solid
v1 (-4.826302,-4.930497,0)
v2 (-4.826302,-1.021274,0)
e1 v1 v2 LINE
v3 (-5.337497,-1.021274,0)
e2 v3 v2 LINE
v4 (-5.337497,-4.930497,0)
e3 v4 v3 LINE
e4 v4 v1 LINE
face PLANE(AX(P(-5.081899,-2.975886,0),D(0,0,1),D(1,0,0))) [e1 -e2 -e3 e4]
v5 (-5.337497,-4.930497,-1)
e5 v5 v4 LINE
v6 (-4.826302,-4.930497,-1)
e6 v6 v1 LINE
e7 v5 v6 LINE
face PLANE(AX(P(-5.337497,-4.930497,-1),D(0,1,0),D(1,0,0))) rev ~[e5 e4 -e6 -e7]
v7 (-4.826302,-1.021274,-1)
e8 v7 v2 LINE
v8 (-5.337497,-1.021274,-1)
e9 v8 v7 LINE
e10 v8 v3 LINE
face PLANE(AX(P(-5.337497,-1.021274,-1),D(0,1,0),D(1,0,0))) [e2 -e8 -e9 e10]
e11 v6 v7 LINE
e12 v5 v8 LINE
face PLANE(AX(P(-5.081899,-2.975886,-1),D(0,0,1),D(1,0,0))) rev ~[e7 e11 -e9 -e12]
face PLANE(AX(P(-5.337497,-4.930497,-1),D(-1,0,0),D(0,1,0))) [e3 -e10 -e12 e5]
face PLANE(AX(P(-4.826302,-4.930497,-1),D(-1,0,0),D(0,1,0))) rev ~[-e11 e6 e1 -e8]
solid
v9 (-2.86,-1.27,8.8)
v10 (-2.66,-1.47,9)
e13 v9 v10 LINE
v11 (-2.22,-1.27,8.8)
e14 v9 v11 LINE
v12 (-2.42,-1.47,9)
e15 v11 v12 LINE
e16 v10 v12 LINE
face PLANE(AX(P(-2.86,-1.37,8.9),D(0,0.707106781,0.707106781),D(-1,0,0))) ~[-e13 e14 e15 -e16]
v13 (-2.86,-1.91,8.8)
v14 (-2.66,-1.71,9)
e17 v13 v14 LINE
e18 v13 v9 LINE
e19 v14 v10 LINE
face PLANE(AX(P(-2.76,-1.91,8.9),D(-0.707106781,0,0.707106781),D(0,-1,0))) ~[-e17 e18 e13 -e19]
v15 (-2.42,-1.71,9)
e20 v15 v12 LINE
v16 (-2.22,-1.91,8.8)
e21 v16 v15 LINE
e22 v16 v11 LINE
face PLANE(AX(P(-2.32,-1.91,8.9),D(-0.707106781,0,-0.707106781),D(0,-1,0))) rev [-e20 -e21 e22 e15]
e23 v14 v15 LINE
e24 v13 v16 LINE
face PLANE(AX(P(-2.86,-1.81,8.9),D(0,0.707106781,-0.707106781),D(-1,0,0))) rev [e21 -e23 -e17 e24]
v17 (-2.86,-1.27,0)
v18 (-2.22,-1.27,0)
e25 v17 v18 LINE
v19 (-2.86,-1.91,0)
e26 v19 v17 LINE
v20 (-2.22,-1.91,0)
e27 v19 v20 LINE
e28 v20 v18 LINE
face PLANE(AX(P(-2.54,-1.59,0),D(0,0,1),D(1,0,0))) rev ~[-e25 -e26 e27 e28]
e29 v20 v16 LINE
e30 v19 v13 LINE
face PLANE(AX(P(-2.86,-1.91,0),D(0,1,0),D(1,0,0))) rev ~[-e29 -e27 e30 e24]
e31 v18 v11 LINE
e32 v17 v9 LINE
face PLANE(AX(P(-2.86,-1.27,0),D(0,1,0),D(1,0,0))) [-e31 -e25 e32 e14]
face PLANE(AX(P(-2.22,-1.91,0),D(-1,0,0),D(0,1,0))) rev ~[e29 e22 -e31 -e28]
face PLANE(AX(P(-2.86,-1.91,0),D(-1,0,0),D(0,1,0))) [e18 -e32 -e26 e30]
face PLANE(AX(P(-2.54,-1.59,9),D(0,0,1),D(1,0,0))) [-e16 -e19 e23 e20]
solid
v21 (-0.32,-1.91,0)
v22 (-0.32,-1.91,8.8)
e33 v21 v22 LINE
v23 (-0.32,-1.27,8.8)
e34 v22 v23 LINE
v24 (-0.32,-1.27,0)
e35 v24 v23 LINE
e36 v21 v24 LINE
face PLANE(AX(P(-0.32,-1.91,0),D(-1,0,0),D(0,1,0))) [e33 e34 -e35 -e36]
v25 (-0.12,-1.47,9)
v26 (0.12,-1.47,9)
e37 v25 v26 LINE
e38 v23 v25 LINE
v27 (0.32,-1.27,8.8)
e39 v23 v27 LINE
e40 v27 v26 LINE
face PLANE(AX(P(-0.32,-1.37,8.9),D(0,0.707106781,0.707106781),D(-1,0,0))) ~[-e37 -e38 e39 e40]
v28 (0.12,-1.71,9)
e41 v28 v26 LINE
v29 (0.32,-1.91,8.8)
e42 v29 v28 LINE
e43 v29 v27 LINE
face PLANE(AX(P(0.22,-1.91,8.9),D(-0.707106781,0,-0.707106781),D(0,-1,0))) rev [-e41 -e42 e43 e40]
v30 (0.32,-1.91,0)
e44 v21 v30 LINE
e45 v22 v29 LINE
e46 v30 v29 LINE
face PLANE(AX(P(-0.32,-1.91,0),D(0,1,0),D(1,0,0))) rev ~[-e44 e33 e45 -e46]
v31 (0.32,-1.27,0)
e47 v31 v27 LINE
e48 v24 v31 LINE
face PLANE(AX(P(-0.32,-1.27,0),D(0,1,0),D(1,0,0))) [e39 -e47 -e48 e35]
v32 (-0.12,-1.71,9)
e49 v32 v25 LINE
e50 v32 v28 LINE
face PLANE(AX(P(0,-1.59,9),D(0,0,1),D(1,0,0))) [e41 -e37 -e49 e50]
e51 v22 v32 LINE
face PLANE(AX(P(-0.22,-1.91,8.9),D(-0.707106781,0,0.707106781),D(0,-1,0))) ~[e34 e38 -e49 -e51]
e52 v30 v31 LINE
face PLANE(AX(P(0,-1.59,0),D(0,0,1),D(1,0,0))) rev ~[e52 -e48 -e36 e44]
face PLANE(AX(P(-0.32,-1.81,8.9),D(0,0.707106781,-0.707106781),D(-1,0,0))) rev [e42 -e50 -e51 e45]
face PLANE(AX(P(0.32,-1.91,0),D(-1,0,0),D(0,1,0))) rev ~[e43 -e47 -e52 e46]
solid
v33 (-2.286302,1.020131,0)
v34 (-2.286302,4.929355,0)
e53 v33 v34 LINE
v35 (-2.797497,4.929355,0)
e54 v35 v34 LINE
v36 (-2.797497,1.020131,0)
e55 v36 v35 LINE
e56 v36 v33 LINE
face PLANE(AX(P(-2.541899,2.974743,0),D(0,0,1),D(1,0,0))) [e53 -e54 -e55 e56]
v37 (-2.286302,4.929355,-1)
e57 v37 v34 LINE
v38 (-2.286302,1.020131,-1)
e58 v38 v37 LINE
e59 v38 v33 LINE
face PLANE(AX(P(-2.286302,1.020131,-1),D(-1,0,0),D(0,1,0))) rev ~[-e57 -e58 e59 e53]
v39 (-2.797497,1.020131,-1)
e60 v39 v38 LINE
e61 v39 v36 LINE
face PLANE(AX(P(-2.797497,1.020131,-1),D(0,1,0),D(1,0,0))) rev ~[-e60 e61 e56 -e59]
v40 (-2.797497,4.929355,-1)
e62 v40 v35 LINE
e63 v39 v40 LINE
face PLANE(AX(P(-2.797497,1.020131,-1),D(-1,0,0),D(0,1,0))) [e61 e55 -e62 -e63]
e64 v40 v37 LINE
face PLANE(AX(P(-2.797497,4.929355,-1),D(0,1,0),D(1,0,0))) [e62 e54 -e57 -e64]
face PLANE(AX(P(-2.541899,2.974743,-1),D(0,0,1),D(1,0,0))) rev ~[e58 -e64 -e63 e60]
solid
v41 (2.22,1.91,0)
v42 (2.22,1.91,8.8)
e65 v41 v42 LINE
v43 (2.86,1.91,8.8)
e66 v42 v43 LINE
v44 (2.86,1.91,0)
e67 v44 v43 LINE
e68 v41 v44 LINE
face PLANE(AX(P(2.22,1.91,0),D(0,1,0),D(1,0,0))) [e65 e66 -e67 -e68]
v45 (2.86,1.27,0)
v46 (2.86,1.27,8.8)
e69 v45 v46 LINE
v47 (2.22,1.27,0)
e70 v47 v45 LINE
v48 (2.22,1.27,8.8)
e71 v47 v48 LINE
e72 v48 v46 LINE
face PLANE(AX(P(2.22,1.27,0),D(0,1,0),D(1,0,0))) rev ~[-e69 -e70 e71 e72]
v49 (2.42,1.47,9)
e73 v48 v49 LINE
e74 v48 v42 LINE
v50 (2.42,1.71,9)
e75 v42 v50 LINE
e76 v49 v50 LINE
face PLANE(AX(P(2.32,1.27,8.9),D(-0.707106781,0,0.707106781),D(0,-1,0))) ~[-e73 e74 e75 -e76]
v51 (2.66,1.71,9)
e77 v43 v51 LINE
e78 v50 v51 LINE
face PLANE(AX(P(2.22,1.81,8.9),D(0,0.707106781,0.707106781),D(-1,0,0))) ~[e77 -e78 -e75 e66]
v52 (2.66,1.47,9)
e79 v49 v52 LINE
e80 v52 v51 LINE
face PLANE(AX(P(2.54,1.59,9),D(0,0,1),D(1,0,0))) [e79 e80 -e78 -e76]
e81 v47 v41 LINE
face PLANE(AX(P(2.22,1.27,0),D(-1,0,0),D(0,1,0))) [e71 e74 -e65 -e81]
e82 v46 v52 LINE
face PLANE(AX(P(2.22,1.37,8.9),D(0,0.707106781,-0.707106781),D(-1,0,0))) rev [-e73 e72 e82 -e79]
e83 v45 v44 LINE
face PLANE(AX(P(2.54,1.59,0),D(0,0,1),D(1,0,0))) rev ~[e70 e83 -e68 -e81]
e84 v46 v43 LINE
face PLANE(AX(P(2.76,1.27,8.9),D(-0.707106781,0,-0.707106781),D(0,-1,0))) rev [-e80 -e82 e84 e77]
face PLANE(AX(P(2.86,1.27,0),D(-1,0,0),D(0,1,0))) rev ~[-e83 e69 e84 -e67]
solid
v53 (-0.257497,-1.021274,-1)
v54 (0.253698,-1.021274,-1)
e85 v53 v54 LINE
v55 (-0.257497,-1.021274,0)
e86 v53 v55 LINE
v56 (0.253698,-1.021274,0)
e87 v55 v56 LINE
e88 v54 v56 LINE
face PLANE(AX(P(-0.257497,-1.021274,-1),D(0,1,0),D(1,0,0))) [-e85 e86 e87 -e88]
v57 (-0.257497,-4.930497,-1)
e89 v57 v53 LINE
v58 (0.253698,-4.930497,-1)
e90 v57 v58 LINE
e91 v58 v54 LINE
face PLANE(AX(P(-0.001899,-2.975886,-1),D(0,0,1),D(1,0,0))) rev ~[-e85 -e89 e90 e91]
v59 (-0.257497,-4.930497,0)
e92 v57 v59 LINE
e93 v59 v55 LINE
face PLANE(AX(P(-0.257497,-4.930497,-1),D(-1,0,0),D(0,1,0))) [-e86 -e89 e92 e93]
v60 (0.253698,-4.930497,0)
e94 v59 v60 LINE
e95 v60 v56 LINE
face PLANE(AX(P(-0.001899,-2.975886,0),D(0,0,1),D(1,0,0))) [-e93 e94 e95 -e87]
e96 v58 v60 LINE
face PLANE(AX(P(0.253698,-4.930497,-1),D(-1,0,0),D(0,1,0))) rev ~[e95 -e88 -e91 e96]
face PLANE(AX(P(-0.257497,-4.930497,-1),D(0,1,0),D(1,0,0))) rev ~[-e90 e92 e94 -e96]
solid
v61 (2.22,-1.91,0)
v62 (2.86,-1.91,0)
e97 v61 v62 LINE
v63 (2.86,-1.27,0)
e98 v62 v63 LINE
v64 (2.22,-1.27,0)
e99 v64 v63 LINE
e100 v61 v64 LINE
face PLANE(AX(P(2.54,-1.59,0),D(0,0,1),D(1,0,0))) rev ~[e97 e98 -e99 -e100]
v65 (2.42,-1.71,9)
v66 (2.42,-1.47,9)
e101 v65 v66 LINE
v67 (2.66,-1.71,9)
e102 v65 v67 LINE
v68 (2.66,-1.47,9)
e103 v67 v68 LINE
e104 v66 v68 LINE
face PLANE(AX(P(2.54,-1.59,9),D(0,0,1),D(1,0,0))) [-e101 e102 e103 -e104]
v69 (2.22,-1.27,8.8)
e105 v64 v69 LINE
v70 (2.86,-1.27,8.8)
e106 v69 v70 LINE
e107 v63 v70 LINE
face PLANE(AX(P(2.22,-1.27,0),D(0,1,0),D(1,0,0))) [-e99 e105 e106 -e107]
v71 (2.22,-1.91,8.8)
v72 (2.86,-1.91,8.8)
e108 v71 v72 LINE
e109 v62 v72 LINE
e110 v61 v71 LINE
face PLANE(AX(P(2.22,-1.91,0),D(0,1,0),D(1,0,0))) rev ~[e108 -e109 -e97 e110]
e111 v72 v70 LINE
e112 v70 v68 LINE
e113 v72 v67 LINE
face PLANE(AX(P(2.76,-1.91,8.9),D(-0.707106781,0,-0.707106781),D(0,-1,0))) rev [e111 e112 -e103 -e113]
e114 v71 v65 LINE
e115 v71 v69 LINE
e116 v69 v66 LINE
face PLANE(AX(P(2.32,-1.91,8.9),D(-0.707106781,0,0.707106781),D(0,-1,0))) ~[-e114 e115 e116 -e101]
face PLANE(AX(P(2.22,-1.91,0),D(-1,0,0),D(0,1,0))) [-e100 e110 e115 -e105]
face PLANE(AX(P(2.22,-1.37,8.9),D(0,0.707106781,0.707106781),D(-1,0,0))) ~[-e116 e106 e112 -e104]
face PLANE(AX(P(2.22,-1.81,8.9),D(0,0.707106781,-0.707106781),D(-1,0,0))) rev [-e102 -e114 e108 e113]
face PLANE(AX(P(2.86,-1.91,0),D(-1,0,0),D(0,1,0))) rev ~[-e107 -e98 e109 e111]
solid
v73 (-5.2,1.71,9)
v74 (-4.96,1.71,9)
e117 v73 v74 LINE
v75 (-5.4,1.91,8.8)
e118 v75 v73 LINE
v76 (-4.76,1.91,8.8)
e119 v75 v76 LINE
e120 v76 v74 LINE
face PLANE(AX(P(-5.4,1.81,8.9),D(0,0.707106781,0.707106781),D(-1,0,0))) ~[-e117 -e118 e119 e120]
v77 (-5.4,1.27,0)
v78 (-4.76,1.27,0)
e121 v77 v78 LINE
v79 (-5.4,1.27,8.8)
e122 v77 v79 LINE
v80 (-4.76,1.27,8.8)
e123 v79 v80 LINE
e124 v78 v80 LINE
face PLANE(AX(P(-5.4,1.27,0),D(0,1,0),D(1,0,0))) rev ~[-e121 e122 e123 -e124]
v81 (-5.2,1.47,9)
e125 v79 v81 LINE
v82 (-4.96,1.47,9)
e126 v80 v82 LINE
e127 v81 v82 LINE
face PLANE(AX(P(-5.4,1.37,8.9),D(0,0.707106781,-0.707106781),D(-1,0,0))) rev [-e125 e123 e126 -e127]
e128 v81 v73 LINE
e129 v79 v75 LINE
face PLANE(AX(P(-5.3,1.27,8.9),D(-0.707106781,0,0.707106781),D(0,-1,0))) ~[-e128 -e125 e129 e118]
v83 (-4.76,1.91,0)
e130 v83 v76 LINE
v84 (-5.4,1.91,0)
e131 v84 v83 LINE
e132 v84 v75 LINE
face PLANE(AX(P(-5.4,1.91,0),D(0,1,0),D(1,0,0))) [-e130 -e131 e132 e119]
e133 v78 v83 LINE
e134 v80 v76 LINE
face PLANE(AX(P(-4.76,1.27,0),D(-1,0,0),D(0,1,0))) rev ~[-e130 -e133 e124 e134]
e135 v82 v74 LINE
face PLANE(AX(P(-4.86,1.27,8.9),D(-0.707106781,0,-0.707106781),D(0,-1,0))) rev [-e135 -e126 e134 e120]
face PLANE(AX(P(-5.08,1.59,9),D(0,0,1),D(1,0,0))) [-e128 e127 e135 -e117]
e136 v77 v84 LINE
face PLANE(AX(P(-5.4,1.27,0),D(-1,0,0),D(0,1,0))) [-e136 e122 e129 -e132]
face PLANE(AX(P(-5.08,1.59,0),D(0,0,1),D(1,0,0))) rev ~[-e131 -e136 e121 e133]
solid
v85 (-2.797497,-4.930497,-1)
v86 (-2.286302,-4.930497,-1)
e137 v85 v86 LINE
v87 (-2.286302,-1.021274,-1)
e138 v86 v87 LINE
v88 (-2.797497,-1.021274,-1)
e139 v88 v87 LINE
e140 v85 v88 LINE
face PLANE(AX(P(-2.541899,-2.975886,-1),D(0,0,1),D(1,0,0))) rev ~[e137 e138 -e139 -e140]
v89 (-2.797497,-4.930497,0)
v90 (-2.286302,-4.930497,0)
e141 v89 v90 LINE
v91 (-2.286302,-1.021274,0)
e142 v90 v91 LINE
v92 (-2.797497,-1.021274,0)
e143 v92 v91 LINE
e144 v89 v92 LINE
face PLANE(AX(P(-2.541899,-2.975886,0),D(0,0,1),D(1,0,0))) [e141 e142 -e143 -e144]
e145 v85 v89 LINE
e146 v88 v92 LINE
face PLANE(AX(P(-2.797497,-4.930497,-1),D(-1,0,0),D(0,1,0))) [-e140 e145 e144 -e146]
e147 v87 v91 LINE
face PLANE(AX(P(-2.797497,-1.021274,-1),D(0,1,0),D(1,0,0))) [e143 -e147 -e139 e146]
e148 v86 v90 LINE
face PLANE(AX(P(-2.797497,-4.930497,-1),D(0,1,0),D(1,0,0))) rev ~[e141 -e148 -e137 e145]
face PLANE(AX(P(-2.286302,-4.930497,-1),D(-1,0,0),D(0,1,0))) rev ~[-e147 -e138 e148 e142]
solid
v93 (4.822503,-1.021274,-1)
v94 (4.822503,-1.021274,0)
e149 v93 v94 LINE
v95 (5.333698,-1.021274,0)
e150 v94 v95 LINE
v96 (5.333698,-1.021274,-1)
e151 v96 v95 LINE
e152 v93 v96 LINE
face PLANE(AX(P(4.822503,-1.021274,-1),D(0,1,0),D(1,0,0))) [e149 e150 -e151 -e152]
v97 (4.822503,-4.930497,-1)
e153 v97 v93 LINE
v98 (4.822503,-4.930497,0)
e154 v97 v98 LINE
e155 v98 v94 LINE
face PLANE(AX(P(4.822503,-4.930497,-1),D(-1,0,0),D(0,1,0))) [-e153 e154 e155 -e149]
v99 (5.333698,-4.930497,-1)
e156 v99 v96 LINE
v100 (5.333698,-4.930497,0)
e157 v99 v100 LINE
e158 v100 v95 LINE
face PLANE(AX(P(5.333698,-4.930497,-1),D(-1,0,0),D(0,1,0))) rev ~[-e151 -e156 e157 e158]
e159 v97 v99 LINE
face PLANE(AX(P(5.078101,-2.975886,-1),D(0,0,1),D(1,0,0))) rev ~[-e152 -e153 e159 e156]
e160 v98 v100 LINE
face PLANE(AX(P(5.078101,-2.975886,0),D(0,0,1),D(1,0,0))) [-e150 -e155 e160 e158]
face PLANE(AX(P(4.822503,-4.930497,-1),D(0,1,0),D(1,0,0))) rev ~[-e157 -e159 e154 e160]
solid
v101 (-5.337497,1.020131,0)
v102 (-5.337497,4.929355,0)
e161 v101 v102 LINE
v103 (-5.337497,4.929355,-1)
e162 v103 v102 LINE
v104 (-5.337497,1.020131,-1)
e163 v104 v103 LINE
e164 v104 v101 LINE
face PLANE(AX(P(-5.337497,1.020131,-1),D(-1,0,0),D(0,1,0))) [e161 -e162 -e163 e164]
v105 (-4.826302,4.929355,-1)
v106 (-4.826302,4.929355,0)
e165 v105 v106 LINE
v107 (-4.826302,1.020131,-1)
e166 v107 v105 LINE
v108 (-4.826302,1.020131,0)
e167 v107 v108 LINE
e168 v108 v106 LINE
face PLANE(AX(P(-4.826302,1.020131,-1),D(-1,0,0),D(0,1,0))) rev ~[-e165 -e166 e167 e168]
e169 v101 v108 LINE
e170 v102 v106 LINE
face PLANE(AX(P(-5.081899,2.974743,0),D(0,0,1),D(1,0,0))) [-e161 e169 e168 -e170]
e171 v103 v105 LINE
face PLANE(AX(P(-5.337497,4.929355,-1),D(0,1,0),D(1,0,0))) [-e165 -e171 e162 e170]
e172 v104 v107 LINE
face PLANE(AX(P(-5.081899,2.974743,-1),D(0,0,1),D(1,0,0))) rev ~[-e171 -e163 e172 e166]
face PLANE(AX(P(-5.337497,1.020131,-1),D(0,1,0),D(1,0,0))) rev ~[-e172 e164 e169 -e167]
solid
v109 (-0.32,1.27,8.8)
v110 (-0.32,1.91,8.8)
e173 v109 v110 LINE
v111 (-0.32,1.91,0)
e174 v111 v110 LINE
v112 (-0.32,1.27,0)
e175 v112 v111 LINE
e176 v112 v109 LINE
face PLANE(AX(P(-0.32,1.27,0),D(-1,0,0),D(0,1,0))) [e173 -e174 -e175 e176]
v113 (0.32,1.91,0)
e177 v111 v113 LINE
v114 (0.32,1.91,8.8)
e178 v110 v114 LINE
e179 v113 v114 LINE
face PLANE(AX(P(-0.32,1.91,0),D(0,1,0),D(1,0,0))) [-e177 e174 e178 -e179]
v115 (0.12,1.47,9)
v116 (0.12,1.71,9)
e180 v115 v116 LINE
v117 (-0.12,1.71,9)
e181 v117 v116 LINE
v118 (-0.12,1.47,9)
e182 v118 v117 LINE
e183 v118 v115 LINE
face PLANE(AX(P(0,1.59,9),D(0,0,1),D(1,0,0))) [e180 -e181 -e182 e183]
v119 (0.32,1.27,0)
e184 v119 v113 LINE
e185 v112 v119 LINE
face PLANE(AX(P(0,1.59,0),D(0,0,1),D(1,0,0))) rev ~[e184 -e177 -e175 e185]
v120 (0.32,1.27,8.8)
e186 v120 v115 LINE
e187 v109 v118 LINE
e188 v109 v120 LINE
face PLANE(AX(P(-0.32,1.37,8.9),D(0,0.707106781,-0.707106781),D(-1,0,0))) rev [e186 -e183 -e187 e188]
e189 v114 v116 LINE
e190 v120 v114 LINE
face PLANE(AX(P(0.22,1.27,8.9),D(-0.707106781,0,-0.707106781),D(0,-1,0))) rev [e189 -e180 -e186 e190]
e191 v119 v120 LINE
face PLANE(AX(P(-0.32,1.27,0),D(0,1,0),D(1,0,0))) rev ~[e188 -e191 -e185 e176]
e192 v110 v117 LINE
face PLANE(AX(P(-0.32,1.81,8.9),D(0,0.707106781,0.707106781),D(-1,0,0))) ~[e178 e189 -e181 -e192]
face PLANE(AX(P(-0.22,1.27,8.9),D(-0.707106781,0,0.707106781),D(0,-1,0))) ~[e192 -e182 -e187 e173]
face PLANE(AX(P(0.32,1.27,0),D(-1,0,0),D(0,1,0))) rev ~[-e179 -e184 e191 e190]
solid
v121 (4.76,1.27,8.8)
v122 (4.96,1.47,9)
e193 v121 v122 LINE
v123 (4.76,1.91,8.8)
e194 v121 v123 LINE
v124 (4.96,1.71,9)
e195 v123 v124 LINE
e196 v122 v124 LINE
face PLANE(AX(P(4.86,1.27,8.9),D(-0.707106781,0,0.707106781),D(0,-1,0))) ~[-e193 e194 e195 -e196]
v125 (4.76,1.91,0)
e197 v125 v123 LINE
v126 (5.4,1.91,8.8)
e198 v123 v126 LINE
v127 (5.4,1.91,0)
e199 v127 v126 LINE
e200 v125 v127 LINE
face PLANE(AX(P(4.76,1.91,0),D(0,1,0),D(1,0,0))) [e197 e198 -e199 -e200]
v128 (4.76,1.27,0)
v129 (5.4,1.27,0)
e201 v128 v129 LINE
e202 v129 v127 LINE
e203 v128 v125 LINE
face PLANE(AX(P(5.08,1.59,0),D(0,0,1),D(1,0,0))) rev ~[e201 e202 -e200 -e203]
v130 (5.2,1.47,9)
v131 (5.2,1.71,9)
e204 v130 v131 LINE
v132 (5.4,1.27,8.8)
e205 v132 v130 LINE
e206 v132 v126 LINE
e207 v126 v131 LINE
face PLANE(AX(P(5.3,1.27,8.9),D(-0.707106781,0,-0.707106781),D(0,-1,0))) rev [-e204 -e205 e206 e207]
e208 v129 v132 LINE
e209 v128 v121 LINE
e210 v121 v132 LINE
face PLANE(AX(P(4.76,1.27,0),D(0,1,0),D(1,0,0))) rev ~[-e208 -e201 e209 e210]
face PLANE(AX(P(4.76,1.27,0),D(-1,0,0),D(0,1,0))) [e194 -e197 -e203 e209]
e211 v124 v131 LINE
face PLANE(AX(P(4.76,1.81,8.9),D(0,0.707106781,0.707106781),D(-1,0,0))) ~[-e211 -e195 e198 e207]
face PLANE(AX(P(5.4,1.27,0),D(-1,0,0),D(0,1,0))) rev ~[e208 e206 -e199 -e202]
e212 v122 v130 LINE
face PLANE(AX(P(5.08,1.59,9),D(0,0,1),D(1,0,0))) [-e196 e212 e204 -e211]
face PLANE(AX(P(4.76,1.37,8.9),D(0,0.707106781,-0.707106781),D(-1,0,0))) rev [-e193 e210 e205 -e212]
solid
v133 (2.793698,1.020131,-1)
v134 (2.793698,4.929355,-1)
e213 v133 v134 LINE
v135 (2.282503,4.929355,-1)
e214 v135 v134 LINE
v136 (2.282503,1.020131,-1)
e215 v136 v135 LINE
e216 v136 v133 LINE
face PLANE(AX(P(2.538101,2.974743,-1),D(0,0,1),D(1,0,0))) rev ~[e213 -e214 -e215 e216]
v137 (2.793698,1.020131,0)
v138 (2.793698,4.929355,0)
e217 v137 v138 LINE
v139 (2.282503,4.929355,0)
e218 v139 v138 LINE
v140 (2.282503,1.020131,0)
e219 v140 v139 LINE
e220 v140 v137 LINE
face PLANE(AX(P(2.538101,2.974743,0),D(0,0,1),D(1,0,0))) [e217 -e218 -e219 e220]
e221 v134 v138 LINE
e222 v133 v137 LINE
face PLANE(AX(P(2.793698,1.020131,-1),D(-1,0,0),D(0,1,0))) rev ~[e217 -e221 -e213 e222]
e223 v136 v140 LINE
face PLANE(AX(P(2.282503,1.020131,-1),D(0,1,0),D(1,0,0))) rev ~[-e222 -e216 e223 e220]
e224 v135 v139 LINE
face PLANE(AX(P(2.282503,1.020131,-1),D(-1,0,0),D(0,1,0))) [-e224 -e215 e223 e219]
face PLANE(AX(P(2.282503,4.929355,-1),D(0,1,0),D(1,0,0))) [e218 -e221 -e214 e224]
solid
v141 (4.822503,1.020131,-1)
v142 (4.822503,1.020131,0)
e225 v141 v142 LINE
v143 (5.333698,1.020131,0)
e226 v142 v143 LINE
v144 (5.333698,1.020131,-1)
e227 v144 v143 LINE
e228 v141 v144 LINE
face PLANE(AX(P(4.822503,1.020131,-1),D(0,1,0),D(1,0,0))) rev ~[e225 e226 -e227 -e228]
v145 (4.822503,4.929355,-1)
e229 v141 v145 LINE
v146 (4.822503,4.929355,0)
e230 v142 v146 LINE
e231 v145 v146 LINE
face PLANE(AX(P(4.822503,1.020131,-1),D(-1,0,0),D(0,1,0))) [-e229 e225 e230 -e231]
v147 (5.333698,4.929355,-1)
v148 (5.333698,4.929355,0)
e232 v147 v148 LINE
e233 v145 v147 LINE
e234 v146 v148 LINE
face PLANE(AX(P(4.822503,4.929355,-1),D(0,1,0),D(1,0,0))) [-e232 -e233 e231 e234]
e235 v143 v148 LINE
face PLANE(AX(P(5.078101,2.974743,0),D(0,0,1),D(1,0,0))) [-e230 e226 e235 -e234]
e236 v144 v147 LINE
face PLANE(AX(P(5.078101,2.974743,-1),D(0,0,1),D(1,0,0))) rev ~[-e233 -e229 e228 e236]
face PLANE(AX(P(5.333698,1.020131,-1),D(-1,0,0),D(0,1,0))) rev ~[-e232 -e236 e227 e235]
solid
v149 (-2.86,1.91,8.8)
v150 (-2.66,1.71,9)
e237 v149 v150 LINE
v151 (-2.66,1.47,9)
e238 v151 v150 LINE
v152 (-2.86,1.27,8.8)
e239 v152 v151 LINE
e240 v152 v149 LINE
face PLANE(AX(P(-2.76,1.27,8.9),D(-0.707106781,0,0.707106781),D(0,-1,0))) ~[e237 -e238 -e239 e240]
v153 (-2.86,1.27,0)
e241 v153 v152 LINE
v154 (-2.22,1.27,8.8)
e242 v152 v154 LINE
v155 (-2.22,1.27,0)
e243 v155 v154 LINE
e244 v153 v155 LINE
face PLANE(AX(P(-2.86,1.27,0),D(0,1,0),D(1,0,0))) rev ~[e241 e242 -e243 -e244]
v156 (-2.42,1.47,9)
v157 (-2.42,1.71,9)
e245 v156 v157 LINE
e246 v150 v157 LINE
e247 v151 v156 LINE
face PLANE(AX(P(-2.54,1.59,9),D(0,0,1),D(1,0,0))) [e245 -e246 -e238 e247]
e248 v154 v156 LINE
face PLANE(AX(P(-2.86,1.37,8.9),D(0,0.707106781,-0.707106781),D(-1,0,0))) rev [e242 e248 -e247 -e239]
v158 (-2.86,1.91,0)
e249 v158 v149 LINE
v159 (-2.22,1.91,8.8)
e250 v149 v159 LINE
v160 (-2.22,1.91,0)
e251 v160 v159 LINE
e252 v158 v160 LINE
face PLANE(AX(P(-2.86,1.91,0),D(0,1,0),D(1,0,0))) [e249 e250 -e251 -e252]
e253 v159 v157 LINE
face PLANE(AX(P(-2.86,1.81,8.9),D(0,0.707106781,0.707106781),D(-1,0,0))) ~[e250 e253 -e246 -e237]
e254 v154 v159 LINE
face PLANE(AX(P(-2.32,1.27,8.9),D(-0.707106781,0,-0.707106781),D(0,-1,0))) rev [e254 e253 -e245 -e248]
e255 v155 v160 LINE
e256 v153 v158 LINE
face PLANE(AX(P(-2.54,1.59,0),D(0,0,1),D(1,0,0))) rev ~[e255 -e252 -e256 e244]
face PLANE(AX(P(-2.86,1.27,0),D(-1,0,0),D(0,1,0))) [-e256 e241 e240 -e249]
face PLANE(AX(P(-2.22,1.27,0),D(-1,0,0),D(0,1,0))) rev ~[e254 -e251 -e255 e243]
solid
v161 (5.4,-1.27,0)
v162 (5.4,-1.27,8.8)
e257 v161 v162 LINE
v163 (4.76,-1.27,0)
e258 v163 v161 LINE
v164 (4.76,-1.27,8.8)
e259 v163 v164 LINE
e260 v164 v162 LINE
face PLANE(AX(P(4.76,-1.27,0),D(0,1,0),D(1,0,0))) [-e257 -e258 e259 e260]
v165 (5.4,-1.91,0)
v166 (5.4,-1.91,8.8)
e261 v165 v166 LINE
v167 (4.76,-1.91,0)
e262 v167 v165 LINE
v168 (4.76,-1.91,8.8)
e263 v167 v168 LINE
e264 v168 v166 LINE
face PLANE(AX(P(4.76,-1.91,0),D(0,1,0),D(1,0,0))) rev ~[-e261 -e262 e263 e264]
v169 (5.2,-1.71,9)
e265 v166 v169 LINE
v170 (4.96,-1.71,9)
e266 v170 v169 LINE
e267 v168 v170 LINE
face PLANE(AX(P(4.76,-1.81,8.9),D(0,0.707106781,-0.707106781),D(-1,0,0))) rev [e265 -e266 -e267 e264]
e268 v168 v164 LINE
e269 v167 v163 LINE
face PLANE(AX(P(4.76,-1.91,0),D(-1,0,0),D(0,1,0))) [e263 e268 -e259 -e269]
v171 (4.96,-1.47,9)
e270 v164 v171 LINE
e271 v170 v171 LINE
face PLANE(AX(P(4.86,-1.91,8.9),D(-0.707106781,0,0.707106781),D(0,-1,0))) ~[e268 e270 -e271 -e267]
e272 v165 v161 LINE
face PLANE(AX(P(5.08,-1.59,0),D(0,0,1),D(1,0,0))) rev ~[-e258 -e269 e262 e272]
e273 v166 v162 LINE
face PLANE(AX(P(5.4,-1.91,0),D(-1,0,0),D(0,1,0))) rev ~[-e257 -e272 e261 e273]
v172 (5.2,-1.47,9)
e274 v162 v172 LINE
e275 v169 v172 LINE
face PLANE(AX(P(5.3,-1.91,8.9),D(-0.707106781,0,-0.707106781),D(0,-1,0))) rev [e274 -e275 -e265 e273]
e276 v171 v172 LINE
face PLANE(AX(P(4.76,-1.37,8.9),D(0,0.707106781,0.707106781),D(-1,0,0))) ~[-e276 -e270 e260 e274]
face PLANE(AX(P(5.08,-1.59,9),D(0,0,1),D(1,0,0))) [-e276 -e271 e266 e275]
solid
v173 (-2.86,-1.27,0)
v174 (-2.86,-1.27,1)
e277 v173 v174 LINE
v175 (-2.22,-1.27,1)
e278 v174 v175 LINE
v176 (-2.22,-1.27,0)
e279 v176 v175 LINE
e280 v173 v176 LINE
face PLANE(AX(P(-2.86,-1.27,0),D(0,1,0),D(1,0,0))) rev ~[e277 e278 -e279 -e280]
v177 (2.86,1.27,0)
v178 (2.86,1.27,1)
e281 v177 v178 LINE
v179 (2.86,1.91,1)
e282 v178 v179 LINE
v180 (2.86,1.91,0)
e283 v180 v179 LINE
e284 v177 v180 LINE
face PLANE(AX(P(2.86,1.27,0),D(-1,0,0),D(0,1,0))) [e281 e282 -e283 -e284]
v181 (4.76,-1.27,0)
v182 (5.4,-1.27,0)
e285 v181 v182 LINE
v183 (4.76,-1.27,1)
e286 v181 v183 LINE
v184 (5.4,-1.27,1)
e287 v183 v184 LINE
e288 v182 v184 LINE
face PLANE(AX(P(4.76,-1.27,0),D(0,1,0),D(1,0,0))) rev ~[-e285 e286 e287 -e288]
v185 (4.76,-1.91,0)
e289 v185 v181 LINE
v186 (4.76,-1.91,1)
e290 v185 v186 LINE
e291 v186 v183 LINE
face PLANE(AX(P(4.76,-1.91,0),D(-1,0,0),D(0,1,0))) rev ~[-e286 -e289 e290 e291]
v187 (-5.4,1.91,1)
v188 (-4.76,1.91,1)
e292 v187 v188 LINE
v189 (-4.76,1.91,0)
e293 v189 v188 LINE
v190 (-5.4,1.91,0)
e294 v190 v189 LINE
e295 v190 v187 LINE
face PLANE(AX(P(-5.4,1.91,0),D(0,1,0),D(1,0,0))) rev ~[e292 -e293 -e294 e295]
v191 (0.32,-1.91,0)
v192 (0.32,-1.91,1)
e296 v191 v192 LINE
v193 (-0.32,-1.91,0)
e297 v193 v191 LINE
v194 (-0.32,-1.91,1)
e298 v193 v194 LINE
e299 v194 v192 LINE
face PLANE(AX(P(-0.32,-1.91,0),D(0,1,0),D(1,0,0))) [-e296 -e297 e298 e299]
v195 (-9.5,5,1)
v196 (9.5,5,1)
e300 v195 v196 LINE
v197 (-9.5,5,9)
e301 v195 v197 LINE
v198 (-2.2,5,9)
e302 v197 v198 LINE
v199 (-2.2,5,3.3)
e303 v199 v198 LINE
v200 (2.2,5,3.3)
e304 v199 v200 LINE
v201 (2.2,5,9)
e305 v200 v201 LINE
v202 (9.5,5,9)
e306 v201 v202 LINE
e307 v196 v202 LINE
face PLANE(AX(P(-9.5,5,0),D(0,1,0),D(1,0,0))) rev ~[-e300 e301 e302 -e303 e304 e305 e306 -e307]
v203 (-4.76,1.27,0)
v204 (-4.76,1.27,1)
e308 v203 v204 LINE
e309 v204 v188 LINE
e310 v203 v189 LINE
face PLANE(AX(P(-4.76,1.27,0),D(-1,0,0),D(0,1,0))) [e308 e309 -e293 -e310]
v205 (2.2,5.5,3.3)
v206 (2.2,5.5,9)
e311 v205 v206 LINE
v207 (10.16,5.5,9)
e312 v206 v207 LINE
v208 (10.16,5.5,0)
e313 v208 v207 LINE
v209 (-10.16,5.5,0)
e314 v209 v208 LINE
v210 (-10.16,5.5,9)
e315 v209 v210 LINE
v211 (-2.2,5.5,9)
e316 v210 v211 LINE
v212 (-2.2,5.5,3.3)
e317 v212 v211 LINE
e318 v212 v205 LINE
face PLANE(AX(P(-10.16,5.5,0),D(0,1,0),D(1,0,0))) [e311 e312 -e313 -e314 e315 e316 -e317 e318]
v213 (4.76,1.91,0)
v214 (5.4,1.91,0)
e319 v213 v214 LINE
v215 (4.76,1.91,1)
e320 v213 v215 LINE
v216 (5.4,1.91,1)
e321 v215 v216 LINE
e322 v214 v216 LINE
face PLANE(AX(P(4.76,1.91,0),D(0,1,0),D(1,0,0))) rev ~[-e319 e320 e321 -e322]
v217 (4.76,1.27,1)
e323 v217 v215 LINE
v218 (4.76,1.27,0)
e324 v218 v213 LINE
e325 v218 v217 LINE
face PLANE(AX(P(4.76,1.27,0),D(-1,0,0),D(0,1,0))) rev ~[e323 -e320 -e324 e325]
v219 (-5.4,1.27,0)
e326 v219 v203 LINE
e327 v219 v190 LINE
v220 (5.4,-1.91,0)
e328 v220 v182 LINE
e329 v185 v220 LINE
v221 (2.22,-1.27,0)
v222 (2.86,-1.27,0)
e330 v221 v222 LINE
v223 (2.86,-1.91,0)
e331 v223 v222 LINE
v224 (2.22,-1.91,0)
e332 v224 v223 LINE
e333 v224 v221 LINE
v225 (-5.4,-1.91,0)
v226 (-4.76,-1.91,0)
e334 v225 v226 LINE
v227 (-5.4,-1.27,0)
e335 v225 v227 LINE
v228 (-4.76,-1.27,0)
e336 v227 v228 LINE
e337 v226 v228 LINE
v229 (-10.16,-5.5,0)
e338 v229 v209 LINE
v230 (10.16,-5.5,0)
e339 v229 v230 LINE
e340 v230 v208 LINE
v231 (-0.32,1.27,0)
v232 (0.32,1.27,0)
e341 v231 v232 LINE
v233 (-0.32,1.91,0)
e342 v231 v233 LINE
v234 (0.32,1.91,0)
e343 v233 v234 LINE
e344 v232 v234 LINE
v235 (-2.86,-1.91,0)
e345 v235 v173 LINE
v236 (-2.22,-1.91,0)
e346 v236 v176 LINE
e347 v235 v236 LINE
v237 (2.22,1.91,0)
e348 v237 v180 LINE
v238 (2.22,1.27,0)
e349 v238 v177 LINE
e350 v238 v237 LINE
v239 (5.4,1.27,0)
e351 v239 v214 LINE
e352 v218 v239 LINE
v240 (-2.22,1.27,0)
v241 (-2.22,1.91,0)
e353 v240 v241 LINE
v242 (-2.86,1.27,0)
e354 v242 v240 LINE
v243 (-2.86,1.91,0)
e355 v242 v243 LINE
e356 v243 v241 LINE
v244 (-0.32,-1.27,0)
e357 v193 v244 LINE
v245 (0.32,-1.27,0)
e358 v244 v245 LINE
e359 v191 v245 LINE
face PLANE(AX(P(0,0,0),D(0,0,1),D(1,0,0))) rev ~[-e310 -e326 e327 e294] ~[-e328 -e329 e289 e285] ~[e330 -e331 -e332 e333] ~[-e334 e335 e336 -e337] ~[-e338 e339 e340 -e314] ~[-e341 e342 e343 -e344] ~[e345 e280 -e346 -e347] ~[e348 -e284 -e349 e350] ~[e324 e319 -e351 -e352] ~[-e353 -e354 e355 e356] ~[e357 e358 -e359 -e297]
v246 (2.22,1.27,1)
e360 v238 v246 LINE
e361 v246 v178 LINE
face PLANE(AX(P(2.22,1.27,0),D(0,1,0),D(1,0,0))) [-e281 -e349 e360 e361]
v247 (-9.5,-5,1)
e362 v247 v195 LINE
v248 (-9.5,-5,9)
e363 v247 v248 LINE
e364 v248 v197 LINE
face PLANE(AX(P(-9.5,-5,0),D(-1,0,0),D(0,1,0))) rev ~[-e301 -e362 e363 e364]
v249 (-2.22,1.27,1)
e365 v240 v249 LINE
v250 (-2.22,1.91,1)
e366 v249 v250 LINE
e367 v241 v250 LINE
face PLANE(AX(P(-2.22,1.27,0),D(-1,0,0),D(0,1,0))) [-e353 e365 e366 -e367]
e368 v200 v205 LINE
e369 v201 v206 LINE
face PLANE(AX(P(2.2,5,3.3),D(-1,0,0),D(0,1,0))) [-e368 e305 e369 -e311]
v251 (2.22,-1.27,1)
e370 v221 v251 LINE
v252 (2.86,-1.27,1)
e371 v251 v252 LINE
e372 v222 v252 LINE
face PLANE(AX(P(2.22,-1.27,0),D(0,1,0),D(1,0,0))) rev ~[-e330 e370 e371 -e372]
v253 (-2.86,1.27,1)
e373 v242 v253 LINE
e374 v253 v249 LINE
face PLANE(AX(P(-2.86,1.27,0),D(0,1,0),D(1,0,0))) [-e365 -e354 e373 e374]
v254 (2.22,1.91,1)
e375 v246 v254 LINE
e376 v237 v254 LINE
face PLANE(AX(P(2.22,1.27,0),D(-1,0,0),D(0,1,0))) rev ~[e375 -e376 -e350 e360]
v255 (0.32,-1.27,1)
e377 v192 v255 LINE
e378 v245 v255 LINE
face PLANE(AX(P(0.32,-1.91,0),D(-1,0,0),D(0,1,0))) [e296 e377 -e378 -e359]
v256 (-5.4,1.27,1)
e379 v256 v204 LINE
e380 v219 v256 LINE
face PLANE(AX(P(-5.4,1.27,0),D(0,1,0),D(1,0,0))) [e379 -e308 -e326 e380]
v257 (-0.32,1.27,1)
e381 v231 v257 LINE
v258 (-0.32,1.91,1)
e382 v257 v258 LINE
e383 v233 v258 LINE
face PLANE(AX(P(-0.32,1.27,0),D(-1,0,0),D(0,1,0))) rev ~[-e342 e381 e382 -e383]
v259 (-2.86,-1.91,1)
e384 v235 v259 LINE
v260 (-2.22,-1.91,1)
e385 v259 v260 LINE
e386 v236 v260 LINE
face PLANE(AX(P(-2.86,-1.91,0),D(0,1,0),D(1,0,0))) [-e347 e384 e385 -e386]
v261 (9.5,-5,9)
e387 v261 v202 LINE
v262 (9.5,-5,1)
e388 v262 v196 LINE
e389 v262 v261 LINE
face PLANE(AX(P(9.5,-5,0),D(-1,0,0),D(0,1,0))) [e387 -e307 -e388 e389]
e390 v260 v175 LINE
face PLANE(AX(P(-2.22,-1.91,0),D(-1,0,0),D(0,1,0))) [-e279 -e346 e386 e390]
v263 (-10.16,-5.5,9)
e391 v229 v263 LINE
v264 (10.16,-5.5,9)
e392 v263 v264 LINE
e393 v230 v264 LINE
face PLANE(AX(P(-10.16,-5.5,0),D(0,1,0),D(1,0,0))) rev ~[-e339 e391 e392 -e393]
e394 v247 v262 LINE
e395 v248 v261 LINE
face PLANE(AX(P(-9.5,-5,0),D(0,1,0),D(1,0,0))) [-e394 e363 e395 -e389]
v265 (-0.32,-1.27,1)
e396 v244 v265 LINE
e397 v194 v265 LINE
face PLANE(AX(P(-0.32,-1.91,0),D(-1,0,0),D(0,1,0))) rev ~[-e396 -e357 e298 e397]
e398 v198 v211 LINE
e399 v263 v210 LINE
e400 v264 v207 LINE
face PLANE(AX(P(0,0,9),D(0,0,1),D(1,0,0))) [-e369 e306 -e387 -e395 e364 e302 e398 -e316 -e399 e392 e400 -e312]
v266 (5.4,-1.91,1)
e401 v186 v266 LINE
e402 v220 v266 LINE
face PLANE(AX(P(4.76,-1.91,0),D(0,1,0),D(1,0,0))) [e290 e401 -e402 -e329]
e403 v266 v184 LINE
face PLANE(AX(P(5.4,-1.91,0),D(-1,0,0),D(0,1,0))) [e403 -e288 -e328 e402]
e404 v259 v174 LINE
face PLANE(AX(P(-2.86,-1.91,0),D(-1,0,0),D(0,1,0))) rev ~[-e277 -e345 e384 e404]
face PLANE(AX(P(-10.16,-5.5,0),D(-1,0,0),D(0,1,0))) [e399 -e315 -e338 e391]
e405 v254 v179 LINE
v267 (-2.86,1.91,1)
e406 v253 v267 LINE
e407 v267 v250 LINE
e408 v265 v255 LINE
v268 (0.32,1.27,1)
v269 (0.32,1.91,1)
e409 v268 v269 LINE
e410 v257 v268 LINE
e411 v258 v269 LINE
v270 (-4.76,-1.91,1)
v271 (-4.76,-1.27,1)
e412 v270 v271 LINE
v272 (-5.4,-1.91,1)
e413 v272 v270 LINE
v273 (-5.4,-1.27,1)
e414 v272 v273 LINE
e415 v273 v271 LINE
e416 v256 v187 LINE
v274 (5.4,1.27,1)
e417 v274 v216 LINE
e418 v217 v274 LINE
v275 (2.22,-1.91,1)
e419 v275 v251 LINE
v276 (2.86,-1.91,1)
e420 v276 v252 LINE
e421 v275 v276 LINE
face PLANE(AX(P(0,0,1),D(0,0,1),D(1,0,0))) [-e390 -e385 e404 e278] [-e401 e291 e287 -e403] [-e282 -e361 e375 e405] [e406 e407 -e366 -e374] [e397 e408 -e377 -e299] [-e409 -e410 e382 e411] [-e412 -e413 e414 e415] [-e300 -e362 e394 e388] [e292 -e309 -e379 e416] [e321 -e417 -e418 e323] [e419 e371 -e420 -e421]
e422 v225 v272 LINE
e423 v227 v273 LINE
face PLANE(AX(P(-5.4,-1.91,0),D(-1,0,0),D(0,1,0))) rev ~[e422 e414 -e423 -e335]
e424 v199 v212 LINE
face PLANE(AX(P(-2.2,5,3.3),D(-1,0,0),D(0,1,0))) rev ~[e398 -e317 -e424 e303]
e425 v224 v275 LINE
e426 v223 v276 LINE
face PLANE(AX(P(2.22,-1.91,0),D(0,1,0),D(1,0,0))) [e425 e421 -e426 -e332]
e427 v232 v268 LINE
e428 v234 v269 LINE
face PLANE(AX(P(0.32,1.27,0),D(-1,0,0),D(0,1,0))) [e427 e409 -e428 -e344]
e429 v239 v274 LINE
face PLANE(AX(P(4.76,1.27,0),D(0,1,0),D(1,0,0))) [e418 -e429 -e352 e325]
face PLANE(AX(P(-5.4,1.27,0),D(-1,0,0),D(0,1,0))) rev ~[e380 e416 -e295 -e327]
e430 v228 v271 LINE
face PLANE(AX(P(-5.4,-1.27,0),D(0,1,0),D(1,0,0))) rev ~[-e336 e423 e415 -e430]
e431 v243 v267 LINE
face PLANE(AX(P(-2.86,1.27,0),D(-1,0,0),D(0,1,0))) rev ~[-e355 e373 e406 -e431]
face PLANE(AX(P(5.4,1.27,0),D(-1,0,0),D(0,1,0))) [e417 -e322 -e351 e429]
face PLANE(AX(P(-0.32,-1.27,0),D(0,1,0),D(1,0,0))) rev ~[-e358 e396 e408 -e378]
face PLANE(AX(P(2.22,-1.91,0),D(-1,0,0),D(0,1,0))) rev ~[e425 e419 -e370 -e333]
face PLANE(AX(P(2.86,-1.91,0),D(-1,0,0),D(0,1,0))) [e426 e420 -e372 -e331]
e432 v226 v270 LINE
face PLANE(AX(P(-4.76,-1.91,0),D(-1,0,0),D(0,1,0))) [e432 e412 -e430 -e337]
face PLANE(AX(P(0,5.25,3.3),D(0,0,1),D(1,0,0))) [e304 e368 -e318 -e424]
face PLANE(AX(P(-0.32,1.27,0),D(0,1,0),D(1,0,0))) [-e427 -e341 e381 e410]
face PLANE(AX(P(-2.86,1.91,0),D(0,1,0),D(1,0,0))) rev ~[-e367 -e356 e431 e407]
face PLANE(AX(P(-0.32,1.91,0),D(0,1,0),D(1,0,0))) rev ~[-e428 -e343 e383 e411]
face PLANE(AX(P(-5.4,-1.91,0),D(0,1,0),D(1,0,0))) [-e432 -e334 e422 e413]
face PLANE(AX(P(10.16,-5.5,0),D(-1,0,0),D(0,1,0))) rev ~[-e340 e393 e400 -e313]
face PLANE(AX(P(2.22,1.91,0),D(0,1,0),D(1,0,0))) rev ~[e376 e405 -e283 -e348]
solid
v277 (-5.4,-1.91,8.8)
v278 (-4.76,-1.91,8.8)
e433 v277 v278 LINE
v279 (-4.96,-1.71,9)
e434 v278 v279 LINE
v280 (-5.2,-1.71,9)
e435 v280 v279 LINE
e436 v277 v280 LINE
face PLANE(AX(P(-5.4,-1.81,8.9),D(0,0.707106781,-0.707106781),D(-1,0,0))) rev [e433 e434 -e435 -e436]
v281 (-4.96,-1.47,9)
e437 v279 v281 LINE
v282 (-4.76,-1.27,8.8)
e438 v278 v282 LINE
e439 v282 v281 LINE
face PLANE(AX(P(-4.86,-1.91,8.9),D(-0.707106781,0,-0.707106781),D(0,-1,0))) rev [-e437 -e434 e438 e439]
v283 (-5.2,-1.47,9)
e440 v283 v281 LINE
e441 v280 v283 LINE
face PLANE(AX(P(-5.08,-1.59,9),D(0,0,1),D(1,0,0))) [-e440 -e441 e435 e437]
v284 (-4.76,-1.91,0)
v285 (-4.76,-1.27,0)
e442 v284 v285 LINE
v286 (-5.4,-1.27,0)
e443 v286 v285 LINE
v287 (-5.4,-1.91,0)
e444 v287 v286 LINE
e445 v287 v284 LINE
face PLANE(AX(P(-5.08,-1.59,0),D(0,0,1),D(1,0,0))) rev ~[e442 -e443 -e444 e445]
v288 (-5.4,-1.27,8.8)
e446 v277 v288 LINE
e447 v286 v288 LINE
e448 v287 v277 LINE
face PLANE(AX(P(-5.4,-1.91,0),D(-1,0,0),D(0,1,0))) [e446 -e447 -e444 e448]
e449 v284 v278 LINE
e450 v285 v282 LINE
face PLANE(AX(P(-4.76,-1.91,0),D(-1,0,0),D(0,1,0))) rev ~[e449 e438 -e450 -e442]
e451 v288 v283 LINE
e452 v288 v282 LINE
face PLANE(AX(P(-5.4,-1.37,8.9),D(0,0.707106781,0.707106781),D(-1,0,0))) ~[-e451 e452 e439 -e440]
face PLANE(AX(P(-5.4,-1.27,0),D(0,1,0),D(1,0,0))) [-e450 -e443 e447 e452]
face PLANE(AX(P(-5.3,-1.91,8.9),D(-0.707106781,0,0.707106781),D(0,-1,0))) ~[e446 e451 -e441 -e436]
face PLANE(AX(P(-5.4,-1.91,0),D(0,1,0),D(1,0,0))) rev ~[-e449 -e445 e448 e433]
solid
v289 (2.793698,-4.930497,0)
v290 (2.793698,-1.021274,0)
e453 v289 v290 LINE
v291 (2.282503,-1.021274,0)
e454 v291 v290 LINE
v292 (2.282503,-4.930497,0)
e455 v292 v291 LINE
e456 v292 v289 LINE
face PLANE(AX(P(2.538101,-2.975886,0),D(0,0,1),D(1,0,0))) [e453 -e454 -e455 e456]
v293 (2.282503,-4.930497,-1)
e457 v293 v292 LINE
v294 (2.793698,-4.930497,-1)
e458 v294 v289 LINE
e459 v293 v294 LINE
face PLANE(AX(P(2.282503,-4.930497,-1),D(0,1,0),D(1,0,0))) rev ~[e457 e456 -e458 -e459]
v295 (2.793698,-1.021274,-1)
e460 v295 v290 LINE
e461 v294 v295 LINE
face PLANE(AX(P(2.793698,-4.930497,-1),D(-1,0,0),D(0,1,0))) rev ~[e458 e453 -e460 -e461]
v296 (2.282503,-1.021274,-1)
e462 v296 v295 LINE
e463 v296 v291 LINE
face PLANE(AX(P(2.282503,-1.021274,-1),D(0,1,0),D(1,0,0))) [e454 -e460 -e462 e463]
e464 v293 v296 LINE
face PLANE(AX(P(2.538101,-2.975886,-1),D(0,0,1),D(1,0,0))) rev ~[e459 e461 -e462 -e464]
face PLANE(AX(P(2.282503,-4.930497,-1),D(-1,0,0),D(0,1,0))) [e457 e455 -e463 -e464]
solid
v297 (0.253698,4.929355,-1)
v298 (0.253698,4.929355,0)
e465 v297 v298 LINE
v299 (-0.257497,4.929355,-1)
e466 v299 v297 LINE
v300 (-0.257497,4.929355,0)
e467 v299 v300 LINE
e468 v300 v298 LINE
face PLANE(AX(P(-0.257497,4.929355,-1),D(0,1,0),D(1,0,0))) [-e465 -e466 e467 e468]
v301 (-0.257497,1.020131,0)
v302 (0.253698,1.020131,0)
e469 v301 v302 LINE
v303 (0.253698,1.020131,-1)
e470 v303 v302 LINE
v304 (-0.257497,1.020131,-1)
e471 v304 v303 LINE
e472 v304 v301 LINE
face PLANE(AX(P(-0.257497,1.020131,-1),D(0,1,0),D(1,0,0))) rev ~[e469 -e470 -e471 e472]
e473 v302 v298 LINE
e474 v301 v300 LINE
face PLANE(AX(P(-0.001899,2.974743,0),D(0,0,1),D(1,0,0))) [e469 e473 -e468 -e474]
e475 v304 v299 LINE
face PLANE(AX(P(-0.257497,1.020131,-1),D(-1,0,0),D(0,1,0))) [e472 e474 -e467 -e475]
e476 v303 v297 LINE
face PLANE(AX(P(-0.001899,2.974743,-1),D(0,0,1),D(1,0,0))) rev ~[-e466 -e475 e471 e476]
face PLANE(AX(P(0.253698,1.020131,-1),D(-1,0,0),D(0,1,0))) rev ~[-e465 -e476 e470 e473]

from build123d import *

# Parameters (mm, degrees)
F0_W       = 20.32
F0_H       = 11
F0_W_2     = 19
F0_H_2     = 10
F1_DEPTH   = 9
F0_W_3     = 0.64
F0_H_3     = 0.64
F2_DEPTH   = 1
F3_DEPTH   = 9
F4_SIZE    = 0.2
F4_2_SIZE  = 0.2
F4_3_SIZE  = 0.2
F4_4_SIZE  = 0.2
F4_5_SIZE  = 0.2
F4_6_SIZE  = 0.2
F6_W       = 4.4
F6_H       = 0.5
F7_DEPTH   = 5.7
F9_W       = 0.5111949686
F9_H       = 3.9092235888
F10_DEPTH  = 1
F11_DEPTH  = 9
F12_SIZE   = 0.2
F12_2_SIZE = 0.2
F12_3_SIZE = 0.2
F12_4_SIZE = 0.2


# Not quite as in the source:
# - a feature names something its author has since deleted; it is built from what else it names


with BuildPart() as f1:
    # F0 (on Top) → F1 (new body)
    with BuildSketch(Plane.XY):
        Rectangle(F0_W, F0_H)
        Rectangle(F0_W_2, F0_H_2, mode=Mode.SUBTRACT)
    extrude(amount=F1_DEPTH)

    # F0 (on Top) → F2 (join)
    with BuildSketch(Plane.XY):
        Rectangle(F0_W_2, F0_H_2)
        with Locations((-5.08, -1.59)):
            Rectangle(F0_W_3, F0_H_3, mode=Mode.SUBTRACT)
        with Locations((-2.54, -1.59)):
            Rectangle(F0_W_3, F0_H_3, mode=Mode.SUBTRACT)
        with Locations((0, -1.59)):
            Rectangle(F0_W_3, F0_H_3, mode=Mode.SUBTRACT)
        with Locations((2.54, -1.59)):
            Rectangle(F0_W_3, F0_H_3, mode=Mode.SUBTRACT)
        with Locations((5.08, -1.59)):
            Rectangle(F0_W_3, F0_H_3, mode=Mode.SUBTRACT)
        with Locations((-5.08, 1.59)):
            Rectangle(F0_W_3, F0_H_3, mode=Mode.SUBTRACT)
        with Locations((-2.54, 1.59)):
            Rectangle(F0_W_3, F0_H_3, mode=Mode.SUBTRACT)
        with Locations((0, 1.59)):
            Rectangle(F0_W_3, F0_H_3, mode=Mode.SUBTRACT)
        with Locations((2.54, 1.59)):
            Rectangle(F0_W_3, F0_H_3, mode=Mode.SUBTRACT)
        with Locations((5.08, 1.59)):
            Rectangle(F0_W_3, F0_H_3, mode=Mode.SUBTRACT)
    extrude(amount=F2_DEPTH)

    # F6 (on offset) → F7 (cut)
    with BuildSketch(Plane.XY.offset(3.3)):
        with Locations((0, 5.25)):
            Rectangle(F6_W, F6_H)
    extrude(amount=F7_DEPTH, mode=Mode.SUBTRACT)


with BuildPart() as f3:
    # F0 (on Top) → F3 (new body)
    with BuildSketch(Plane.XY):
        with Locations((0, -1.59)):
            Rectangle(F0_W_3, F0_H_3)
    extrude(amount=F3_DEPTH)

    # F4#2
    f4_2_edges = [f3.edges().sort_by_distance(p)[0] for p in [
        (0, -1.27, 9),
        (-0.32, -1.59, 9),
        (0, -1.91, 9),
        (0.32, -1.59, 9),
    ]]
    chamfer(f4_2_edges, length=F4_2_SIZE)


with BuildPart() as f3b:
    # F0 (on Top) → F3, piece 2 (new body)
    with BuildSketch(Plane.XY):
        with Locations((0, 1.59)):
            Rectangle(F0_W_3, F0_H_3)
    extrude(amount=F3_DEPTH)

    # F4
    f4_edges = [f3b.edges().sort_by_distance(p)[0] for p in [
        (-0.32, 1.59, 9),
        (0, 1.27, 9),
        (0.32, 1.59, 9),
        (0, 1.91, 9),
    ]]
    chamfer(f4_edges, length=F4_SIZE)


with BuildPart() as f3c:
    # F0 (on Top) → F3, piece 3 (new body)
    with BuildSketch(Plane.XY):
        with Locations((2.54, 1.59)):
            Rectangle(F0_W_3, F0_H_3)
    extrude(amount=F3_DEPTH)

    # F4#4
    f4_4_edges = [f3c.edges().sort_by_distance(p)[0] for p in [
        (2.22, 1.59, 9),
        (2.54, 1.27, 9),
        (2.86, 1.59, 9),
        (2.54, 1.91, 9),
    ]]
    chamfer(f4_4_edges, length=F4_4_SIZE)


with BuildPart() as f3d:
    # F0 (on Top) → F3, piece 4 (new body)
    with BuildSketch(Plane.XY):
        with Locations((2.54, -1.59)):
            Rectangle(F0_W_3, F0_H_3)
    extrude(amount=F3_DEPTH)

    # F4#3
    f4_3_edges = [f3d.edges().sort_by_distance(p)[0] for p in [
        (2.22, -1.59, 9),
        (2.54, -1.91, 9),
        (2.86, -1.59, 9),
        (2.54, -1.27, 9),
    ]]
    chamfer(f4_3_edges, length=F4_3_SIZE)


with BuildPart() as f3e:
    # F0 (on Top) → F3, piece 5 (new body)
    with BuildSketch(Plane.XY):
        with Locations((5.08, 1.59)):
            Rectangle(F0_W_3, F0_H_3)
    extrude(amount=F3_DEPTH)

    # F4#5
    f4_5_edges = [f3e.edges().sort_by_distance(p)[0] for p in [
        (4.76, 1.59, 9),
        (5.08, 1.27, 9),
        (5.08, 1.91, 9),
        (5.4, 1.59, 9),
    ]]
    chamfer(f4_5_edges, length=F4_5_SIZE)


with BuildPart() as f3f:
    # F0 (on Top) → F3, piece 6 (new body)
    with BuildSketch(Plane.XY):
        with Locations((5.08, -1.59)):
            Rectangle(F0_W_3, F0_H_3)
    extrude(amount=F3_DEPTH)

    # F4#6
    f4_6_edges = [f3f.edges().sort_by_distance(p)[0] for p in [
        (5.08, -1.27, 9),
        (4.76, -1.59, 9),
        (5.08, -1.91, 9),
        (5.4, -1.59, 9),
    ]]
    chamfer(f4_6_edges, length=F4_6_SIZE)


with BuildPart() as f10:
    # F9 (on offset) → F10 (new body)
    with BuildSketch(Plane.XY.offset(-1)):
        with Locations((5.0781009255, -2.9758856997)):
            Rectangle(F9_W, F9_H)
    extrude(amount=F10_DEPTH)


with BuildPart() as f10b:
    # F9 (on offset) → F10, piece 2 (new body)
    with BuildSketch(Plane.XY.offset(-1)):
        with Locations((2.5381009255, -2.9758856997)):
            Rectangle(F9_W, F9_H)
    extrude(amount=F10_DEPTH)


with BuildPart() as f10c:
    # F9 (on offset) → F10, piece 3 (new body)
    with BuildSketch(Plane.XY.offset(-1)):
        with Locations((-0.0018990745, -2.9758856997)):
            Rectangle(F9_W, F9_H)
    extrude(amount=F10_DEPTH)


with BuildPart() as f10d:
    # F9 (on offset) → F10, piece 4 (new body)
    with BuildSketch(Plane.XY.offset(-1)):
        with Locations((-2.5418990745, -2.9758856997)):
            Rectangle(F9_W, F9_H)
    extrude(amount=F10_DEPTH)


with BuildPart() as f10e:
    # F9 (on offset) → F10, piece 5 (new body)
    with BuildSketch(Plane.XY.offset(-1)):
        with Locations((-5.0818990745, -2.9758856997)):
            Rectangle(F9_W, F9_H)
    extrude(amount=F10_DEPTH)


with BuildPart() as f10f:
    # F9 (on offset) → F10, piece 6 (new body)
    with BuildSketch(Plane.XY.offset(-1)):
        with Locations((-5.0818990745, 2.9747432311)):
            Rectangle(F9_W, F9_H)
    extrude(amount=F10_DEPTH)


with BuildPart() as f10g:
    # F9 (on offset) → F10, piece 7 (new body)
    with BuildSketch(Plane.XY.offset(-1)):
        with Locations((-2.5418990745, 2.9747432311)):
            Rectangle(F9_W, F9_H)
    extrude(amount=F10_DEPTH)


with BuildPart() as f10h:
    # F9 (on offset) → F10, piece 8 (new body)
    with BuildSketch(Plane.XY.offset(-1)):
        with Locations((-0.0018990745, 2.9747432311)):
            Rectangle(F9_W, F9_H)
    extrude(amount=F10_DEPTH)


with BuildPart() as f10i:
    # F9 (on offset) → F10, piece 9 (new body)
    with BuildSketch(Plane.XY.offset(-1)):
        with Locations((2.5381009255, 2.9747432311)):
            Rectangle(F9_W, F9_H)
    extrude(amount=F10_DEPTH)


with BuildPart() as f10j:
    # F9 (on offset) → F10, piece 10 (new body)
    with BuildSketch(Plane.XY.offset(-1)):
        with Locations((5.0781009255, 2.9747432311)):
            Rectangle(F9_W, F9_H)
    extrude(amount=F10_DEPTH)


with BuildPart() as f11:
    # F0 (on Top) → F11 (new body)
    with BuildSketch(Plane.XY):
        with Locations((-5.08, 1.59)):
            Rectangle(F0_W_3, F0_H_3)
    extrude(amount=F11_DEPTH)

    # F12
    f12_edges = [f11.edges().sort_by_distance(p)[0] for p in [
        (-5.4, 1.59, 9),
        (-5.08, 1.91, 9),
        (-5.08, 1.27, 9),
        (-4.76, 1.59, 9),
    ]]
    chamfer(f12_edges, length=F12_SIZE)


with BuildPart() as f11b:
    # F0 (on Top) → F11, piece 2 (new body)
    with BuildSketch(Plane.XY):
        with Locations((-2.54, 1.59)):
            Rectangle(F0_W_3, F0_H_3)
    extrude(amount=F11_DEPTH)

    # F12#2
    f12_2_edges = [f11b.edges().sort_by_distance(p)[0] for p in [
        (-2.86, 1.59, 9),
        (-2.54, 1.91, 9),
        (-2.22, 1.59, 9),
        (-2.54, 1.27, 9),
    ]]
    chamfer(f12_2_edges, length=F12_2_SIZE)


with BuildPart() as f11c:
    # F0 (on Top) → F11, piece 3 (new body)
    with BuildSketch(Plane.XY):
        with Locations((-2.54, -1.59)):
            Rectangle(F0_W_3, F0_H_3)
    extrude(amount=F11_DEPTH)

    # F12#4
    f12_4_edges = [f11c.edges().sort_by_distance(p)[0] for p in [
        (-2.86, -1.59, 9),
        (-2.54, -1.91, 9),
        (-2.22, -1.59, 9),
        (-2.54, -1.27, 9),
    ]]
    chamfer(f12_4_edges, length=F12_4_SIZE)


with BuildPart() as f11d:
    # F0 (on Top) → F11, piece 4 (new body)
    with BuildSketch(Plane.XY):
        with Locations((-5.08, -1.59)):
            Rectangle(F0_W_3, F0_H_3)
    extrude(amount=F11_DEPTH)

    # F12#3
    f12_3_edges = [f11d.edges().sort_by_distance(p)[0] for p in [
        (-5.4, -1.59, 9),
        (-5.08, -1.27, 9),
        (-4.76, -1.59, 9),
        (-5.08, -1.91, 9),
    ]]
    chamfer(f12_3_edges, length=F12_3_SIZE)


solid = Compound([f1.part, f3.part, f3b.part, f3c.part, f3d.part, f3e.part, f3f.part, f10.part, f10b.part, f10c.part, f10d.part, f10e.part, f10f.part, f10g.part, f10h.part, f10i.part, f10j.part, f11.part, f11b.part, f11c.part, f11d.part])
